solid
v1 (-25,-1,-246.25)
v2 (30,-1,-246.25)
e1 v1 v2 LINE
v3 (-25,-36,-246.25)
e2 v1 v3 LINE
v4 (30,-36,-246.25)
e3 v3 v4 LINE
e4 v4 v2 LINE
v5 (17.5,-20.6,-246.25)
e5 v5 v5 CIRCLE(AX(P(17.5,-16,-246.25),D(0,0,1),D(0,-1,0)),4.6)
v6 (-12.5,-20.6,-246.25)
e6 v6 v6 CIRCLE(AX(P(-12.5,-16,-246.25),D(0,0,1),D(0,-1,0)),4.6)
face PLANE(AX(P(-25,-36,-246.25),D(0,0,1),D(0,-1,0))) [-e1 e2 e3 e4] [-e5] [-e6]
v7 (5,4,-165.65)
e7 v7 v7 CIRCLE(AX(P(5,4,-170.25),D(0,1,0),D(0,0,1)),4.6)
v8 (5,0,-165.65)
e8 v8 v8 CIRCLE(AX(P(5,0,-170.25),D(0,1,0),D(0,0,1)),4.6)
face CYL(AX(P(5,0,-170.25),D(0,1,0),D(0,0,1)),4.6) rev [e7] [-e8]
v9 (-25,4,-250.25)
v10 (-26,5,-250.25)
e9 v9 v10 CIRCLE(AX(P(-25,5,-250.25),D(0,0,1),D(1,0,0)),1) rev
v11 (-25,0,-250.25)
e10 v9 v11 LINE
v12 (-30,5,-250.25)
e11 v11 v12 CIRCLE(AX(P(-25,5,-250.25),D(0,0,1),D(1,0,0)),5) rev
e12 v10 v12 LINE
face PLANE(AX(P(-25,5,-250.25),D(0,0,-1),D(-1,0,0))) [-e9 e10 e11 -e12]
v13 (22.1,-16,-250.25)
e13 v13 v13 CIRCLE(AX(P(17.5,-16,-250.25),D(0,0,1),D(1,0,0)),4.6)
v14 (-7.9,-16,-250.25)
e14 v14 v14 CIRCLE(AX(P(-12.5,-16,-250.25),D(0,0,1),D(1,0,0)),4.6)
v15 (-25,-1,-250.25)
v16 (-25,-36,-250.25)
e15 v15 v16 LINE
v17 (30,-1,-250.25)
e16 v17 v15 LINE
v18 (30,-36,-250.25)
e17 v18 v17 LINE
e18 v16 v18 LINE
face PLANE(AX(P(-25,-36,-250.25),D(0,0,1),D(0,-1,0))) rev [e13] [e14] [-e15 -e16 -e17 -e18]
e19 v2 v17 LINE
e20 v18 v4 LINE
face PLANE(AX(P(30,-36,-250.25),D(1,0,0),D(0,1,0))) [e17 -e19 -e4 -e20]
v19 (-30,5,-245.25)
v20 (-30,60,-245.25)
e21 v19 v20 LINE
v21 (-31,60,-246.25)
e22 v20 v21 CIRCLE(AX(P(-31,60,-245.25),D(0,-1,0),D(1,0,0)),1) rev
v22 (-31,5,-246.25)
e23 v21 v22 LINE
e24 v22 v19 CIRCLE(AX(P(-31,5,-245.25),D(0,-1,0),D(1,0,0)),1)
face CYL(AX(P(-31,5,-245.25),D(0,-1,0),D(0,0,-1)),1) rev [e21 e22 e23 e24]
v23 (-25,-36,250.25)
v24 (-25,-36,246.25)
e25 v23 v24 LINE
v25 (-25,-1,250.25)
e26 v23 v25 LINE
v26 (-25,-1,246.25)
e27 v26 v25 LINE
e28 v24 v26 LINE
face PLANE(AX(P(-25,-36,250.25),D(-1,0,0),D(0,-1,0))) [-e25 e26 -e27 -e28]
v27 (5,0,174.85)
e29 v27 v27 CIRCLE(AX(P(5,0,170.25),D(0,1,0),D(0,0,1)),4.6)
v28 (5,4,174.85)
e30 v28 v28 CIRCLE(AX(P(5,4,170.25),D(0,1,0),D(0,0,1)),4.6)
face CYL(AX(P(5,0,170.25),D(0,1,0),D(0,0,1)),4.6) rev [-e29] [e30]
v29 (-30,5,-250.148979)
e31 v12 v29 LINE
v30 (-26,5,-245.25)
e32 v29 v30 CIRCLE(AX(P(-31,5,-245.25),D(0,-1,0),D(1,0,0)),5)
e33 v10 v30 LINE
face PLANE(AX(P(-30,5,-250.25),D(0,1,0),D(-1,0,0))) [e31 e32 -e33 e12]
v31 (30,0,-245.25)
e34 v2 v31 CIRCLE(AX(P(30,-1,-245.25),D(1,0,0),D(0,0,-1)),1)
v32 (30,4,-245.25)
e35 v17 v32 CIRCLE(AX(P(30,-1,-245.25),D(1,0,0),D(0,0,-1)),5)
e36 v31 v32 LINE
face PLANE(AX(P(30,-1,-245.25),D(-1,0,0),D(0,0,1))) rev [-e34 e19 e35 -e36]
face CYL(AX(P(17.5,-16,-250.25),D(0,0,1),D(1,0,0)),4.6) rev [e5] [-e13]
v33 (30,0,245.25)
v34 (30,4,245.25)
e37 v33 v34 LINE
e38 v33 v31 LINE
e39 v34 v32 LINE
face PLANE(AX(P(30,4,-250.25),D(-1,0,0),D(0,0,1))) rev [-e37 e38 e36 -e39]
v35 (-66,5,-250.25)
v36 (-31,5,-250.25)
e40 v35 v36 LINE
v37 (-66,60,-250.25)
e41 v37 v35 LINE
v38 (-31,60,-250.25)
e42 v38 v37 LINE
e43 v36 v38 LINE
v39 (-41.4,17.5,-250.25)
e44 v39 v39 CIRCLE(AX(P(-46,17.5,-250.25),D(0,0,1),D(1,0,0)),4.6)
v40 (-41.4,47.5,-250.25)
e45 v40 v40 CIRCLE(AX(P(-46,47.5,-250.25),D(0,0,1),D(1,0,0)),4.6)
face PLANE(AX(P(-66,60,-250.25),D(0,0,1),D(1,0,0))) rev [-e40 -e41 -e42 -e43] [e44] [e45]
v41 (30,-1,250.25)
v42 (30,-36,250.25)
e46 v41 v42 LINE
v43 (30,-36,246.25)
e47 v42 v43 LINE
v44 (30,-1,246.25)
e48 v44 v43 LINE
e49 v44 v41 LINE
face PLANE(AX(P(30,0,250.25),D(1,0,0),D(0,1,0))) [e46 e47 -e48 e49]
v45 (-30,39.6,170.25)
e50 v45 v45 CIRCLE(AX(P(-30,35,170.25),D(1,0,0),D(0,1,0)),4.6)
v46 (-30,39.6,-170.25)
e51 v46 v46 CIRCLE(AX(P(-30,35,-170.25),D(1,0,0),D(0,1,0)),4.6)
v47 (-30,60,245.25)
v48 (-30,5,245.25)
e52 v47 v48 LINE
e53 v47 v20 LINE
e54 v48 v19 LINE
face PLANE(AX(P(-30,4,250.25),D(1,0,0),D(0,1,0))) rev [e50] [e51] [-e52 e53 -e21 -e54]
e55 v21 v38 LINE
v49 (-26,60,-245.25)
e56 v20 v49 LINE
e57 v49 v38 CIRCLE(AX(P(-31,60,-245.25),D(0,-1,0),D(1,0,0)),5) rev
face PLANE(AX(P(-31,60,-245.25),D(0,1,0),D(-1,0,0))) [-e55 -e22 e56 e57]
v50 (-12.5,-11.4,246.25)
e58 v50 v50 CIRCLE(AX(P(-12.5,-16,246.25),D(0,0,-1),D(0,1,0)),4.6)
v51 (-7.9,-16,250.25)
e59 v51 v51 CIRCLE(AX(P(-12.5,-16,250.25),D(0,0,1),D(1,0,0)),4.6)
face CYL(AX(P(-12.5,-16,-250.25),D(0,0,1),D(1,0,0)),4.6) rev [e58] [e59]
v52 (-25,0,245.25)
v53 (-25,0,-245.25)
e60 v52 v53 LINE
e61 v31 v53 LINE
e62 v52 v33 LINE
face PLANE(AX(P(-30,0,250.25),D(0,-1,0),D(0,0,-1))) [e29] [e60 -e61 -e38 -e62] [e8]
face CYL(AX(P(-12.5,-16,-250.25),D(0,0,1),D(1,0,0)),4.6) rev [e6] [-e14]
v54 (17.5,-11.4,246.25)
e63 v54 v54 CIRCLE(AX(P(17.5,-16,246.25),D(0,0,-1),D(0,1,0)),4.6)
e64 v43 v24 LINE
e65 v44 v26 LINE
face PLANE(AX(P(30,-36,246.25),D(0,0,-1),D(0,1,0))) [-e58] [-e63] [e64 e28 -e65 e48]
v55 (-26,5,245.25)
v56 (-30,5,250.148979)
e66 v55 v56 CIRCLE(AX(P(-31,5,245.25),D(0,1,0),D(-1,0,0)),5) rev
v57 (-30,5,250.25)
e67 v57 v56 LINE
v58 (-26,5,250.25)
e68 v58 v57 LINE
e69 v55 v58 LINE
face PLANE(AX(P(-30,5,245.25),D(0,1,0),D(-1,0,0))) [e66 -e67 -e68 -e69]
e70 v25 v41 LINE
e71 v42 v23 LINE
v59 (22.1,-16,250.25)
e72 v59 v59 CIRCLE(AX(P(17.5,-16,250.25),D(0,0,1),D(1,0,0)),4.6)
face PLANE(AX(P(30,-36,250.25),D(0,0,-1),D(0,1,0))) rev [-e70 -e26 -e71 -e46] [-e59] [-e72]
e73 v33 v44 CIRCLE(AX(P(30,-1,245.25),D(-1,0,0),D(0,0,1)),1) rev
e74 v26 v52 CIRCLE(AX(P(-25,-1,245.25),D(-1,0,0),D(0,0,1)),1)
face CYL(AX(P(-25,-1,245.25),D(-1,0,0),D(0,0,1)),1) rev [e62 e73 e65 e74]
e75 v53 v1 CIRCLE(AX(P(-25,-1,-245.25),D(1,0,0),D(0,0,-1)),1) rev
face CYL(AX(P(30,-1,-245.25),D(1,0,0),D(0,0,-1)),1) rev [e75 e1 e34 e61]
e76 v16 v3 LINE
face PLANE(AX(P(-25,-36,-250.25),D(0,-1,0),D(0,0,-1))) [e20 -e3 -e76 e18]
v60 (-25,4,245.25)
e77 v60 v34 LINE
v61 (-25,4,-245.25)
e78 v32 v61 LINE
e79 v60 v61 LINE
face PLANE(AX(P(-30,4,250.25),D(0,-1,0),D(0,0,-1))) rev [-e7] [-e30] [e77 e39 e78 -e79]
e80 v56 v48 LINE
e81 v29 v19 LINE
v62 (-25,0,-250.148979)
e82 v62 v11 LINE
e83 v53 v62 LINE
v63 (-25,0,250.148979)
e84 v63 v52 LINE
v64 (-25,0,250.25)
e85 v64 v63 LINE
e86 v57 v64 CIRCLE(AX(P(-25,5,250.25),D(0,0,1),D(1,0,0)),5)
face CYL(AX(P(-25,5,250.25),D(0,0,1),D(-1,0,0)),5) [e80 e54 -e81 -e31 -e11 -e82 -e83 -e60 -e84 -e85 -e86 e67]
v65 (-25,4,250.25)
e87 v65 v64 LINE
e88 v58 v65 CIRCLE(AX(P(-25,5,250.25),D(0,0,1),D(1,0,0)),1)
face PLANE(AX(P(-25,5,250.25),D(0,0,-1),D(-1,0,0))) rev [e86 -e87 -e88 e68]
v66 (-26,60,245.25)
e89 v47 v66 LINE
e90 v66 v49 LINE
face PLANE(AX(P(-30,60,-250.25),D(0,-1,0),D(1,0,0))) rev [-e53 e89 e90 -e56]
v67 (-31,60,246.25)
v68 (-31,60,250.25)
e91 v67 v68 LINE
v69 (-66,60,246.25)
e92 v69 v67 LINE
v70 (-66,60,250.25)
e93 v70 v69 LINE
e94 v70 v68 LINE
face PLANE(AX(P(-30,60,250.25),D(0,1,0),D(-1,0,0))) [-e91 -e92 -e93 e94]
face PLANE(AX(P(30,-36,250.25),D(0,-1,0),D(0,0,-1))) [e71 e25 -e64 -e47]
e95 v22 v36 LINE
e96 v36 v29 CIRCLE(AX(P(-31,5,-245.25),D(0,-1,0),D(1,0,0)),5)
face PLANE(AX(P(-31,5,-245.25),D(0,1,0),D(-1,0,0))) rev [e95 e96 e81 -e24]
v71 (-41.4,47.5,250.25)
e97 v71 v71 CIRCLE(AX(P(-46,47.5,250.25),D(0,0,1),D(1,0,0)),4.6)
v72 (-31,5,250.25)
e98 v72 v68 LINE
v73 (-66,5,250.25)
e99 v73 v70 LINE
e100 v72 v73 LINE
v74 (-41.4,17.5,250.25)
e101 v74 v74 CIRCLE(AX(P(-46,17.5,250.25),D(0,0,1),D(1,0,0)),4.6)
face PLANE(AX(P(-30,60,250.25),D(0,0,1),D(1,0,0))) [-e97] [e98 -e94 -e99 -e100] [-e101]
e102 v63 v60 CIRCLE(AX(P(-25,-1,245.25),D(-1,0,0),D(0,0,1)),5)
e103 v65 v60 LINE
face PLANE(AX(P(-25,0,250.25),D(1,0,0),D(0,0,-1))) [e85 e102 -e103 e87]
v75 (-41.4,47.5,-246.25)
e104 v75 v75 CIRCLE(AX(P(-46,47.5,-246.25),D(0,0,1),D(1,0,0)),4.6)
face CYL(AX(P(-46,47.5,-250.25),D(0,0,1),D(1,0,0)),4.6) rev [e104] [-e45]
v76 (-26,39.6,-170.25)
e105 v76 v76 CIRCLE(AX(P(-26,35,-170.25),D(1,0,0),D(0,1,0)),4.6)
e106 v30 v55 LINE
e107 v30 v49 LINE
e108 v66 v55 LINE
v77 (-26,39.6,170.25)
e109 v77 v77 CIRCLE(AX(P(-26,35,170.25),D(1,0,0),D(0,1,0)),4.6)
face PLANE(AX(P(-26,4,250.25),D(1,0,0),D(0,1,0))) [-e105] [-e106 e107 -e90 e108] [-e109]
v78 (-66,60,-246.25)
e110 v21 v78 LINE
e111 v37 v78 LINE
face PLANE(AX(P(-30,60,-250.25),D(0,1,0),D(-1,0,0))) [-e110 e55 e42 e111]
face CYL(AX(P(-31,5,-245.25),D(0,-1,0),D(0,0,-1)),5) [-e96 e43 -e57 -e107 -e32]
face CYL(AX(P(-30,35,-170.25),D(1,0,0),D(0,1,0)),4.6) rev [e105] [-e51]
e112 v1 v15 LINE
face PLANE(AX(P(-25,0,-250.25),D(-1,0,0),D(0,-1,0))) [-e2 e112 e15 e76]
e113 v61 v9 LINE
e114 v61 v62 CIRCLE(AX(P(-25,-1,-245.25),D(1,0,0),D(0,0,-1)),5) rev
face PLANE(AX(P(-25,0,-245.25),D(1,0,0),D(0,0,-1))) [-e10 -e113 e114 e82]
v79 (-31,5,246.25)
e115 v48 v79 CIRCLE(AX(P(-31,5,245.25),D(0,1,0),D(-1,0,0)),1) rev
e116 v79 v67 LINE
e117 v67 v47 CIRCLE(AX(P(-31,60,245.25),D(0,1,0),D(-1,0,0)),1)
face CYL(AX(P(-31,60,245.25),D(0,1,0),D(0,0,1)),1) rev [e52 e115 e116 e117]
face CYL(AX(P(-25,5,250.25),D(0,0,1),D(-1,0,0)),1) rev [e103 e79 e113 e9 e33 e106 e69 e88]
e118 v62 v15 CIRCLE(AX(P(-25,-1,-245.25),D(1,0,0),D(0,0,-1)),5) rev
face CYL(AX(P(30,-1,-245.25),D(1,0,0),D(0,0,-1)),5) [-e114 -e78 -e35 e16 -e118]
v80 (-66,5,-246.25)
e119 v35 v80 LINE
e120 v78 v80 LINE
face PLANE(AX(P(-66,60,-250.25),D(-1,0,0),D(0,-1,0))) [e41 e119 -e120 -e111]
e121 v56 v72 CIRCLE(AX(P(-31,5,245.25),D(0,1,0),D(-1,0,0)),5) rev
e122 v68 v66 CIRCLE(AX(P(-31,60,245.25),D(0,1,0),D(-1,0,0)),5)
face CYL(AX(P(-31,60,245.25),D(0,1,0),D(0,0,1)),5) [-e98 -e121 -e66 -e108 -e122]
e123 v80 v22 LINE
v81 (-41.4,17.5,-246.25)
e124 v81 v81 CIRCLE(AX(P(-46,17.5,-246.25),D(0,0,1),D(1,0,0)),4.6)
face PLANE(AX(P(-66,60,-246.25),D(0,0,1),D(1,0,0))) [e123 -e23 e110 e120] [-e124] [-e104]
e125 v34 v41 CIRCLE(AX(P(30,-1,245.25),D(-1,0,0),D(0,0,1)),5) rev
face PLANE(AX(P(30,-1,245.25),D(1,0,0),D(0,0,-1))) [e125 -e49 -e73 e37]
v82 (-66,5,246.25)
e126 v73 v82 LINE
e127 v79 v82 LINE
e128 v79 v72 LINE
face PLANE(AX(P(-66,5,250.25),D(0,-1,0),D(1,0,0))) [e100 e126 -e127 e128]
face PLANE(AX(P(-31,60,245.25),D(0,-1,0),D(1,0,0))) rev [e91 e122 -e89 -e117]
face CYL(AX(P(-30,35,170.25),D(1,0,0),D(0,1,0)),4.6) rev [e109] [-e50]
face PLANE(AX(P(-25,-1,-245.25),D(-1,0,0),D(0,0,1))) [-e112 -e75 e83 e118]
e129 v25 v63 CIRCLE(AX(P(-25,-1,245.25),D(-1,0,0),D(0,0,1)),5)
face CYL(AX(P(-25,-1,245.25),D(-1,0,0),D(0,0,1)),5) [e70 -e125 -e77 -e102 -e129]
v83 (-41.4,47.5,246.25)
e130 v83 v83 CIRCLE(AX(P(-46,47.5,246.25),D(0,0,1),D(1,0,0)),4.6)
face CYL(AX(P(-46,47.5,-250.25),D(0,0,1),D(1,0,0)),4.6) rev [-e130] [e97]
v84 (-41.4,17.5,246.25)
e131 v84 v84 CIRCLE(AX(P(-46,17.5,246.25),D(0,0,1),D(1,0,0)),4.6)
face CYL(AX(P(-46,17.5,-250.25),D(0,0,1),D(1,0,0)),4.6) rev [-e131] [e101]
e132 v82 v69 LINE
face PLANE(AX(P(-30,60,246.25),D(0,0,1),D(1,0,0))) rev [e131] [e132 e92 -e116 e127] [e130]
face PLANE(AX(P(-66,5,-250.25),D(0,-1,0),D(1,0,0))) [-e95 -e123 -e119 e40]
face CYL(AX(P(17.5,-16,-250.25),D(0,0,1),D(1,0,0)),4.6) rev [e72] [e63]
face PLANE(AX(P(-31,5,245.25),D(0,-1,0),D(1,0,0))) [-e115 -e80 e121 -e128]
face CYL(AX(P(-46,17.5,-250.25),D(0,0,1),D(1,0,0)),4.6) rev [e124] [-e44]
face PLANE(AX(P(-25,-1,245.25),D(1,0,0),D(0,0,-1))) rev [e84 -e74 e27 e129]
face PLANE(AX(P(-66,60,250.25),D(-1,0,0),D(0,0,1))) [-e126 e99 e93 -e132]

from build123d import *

# Parameters (mm, degrees)
SKETCH1_W                      = 60
SKETCH1_H                      = 500.5
BASE_FLANGE1_DEPTH             = 4
EDGE_FLANGE1_STRIP_W           = 18
EDGE_FLANGE1_STRIP_H           = 4
EDGE_FLANGE1_STRIP_CUT_DEPTH   = 500.5
EDGE_FLANGE1_DEPTH             = 500.5
EDGE_FLANGE2_STRIP_W           = 18
EDGE_FLANGE2_STRIP_H           = 4
EDGE_FLANGE2_STRIP_CUT_DEPTH   = 55
EDGE_FLANGE2_STRIP_2_W         = 18
EDGE_FLANGE2_STRIP_2_H         = 4
EDGE_FLANGE2_STRIP_CUT_2_DEPTH = 55
EDGE_FLANGE2_STRIP_3_W         = 18
EDGE_FLANGE2_STRIP_3_H         = 4
EDGE_FLANGE2_STRIP_CUT_3_DEPTH = 55
EDGE_FLANGE2_STRIP_4_W         = 18
EDGE_FLANGE2_STRIP_4_H         = 4
EDGE_FLANGE2_STRIP_CUT_4_DEPTH = 55
EDGE_FLANGE2_DEPTH             = 55
EDGE_FLANGE2_BEND_DEPTH        = 55
EDGE_FLANGE2_BEND_2_DEPTH      = 55
EDGE_FLANGE2_BEND_3_DEPTH      = 55
SKETCH18_R                     = 4.6
EXTRUDE1_DEPTH                 = 509.385926241
SKETCH19_R                     = 4.6
EXTRUDE2_DEPTH                 = 4
SKETCH20_R                     = 4.6
EXTRUDE3_DEPTH                 = 4


# Sheet-metal steps are written as plain solids
with BuildPart() as part:
    # Sketch1 → Base-Flange1 (new body)
    with BuildSketch(Plane(origin=(0, 0, 0), x_dir=(1, 0, 0), z_dir=(0, 1, 0))):
        Rectangle(SKETCH1_W, SKETCH1_H)
    extrude(amount=BASE_FLANGE1_DEPTH)

    # Edge-Flange1 strip (across the edge) → Edge-Flange1 strip cut (cut)
    with BuildSketch(Plane(origin=(-30, 4, -250.25), x_dir=(1, 0, 0), z_dir=(0, 0, 1))):
        with Locations((-4, -2)):
            Rectangle(EDGE_FLANGE1_STRIP_W, EDGE_FLANGE1_STRIP_H)
    extrude(amount=EDGE_FLANGE1_STRIP_CUT_DEPTH, mode=Mode.SUBTRACT)

    # Edge-Flange1 section (across the edge) → Edge-Flange1 (add)
    with BuildSketch(Plane(origin=(-30, 4, -250.25), x_dir=(1, 0, 0), z_dir=(0, 0, 1))):
        with BuildLine():
            Line((0, 1), (0, 56))
            Line((0, 56), (4, 56))
            Line((4, 56), (4, 1))
            ThreePointArc((4, 1), (4.292893219, 0.292893219), (5, 0))
            Line((5, 0), (5, -4))
            ThreePointArc((5, -4), (1.464466094, -2.535533906), (0, 1))
        make_face()
    extrude(amount=EDGE_FLANGE1_DEPTH)

    # Edge-Flange2 strip (across the edge) → Edge-Flange2 strip cut (cut)
    with BuildSketch(Plane(origin=(-30, 5, 250.25), x_dir=(0, 0, -1), z_dir=(0, 1, 0))):
        with Locations((-4, -2)):
            Rectangle(EDGE_FLANGE2_STRIP_W, EDGE_FLANGE2_STRIP_H)
    extrude(amount=EDGE_FLANGE2_STRIP_CUT_DEPTH, mode=Mode.SUBTRACT)

    # Edge-Flange2 strip 2 (across the edge) → Edge-Flange2 strip cut 2 (cut)
    with BuildSketch(Plane(origin=(30, 0, 250.25), x_dir=(0, 0, -1), z_dir=(-1, 0, 0))):
        with Locations((-4, -2)):
            Rectangle(EDGE_FLANGE2_STRIP_2_W, EDGE_FLANGE2_STRIP_2_H)
    extrude(amount=EDGE_FLANGE2_STRIP_CUT_2_DEPTH, mode=Mode.SUBTRACT)

    # Edge-Flange2 strip 3 (across the edge) → Edge-Flange2 strip cut 3 (cut)
    with BuildSketch(Plane(origin=(-30, 60, -250.25), x_dir=(0, 0, 1), z_dir=(0, -1, 0))):
        with Locations((-4, -2)):
            Rectangle(EDGE_FLANGE2_STRIP_3_W, EDGE_FLANGE2_STRIP_3_H)
    extrude(amount=EDGE_FLANGE2_STRIP_CUT_3_DEPTH, mode=Mode.SUBTRACT)

    # Edge-Flange2 strip 4 (across the edge) → Edge-Flange2 strip cut 4 (cut)
    with BuildSketch(Plane(origin=(-25, 0, -250.25), x_dir=(0, 0, 1), z_dir=(1, 0, 0))):
        with Locations((-4, -2)):
            Rectangle(EDGE_FLANGE2_STRIP_4_W, EDGE_FLANGE2_STRIP_4_H)
    extrude(amount=EDGE_FLANGE2_STRIP_CUT_4_DEPTH, mode=Mode.SUBTRACT)

    # Edge-Flange2 section (across the edge) → Edge-Flange2 (add)
    with BuildSketch(Plane(origin=(-30, 5, 250.25), x_dir=(0, 0, -1), z_dir=(0, 1, 0))):
        with BuildLine():
            Line((0, 1), (0, 36))
            Line((0, 36), (4, 36))
            Line((4, 36), (4, 1))
            ThreePointArc((4, 1), (4.292893219, 0.292893219), (5, 0))
            Line((5, 0), (5, -4))
            ThreePointArc((5, -4), (1.464466094, -2.535533906), (0, 1))
        make_face()
    extrude(amount=EDGE_FLANGE2_DEPTH)

    # Edge-Flange2 section 2 (across the edge) → Edge-Flange2 bend (add)
    with BuildSketch(Plane(origin=(30, 0, 250.25), x_dir=(0, 0, -1), z_dir=(-1, 0, 0))):
        with BuildLine():
            Line((0, 1), (0, 36))
            Line((0, 36), (4, 36))
            Line((4, 36), (4, 1))
            ThreePointArc((4, 1), (4.292893219, 0.292893219), (5, 0))
            Line((5, 0), (5, -4))
            ThreePointArc((5, -4), (1.464466094, -2.535533906), (0, 1))
        make_face()
    extrude(amount=EDGE_FLANGE2_BEND_DEPTH)

    # Edge-Flange2 section 3 (across the edge) → Edge-Flange2 bend 2 (add)
    with BuildSketch(Plane(origin=(-30, 60, -250.25), x_dir=(0, 0, 1), z_dir=(0, -1, 0))):
        with BuildLine():
            Line((0, 1), (0, 36))
            Line((0, 36), (4, 36))
            Line((4, 36), (4, 1))
            ThreePointArc((4, 1), (4.292893219, 0.292893219), (5, 0))
            Line((5, 0), (5, -4))
            ThreePointArc((5, -4), (1.464466094, -2.535533906), (0, 1))
        make_face()
    extrude(amount=EDGE_FLANGE2_BEND_2_DEPTH)

    # Edge-Flange2 section 4 (across the edge) → Edge-Flange2 bend 3 (add)
    with BuildSketch(Plane(origin=(-25, 0, -250.25), x_dir=(0, 0, 1), z_dir=(1, 0, 0))):
        with BuildLine():
            Line((0, 1), (0, 36))
            Line((0, 36), (4, 36))
            Line((4, 36), (4, 1))
            ThreePointArc((4, 1), (4.292893219, 0.292893219), (5, 0))
            Line((5, 0), (5, -4))
            ThreePointArc((5, -4), (1.464466094, -2.535533906), (0, 1))
        make_face()
    extrude(amount=EDGE_FLANGE2_BEND_3_DEPTH)

    # Sketch18 → Extrude1 (cut, through all)
    with BuildSketch(Plane.XY.offset(250.25)):
        with Locations((-46, 47.5)):
            Circle(SKETCH18_R)
        with Locations((-46, 17.5)):
            Circle(SKETCH18_R)
        with Locations((-12.5, -16)):
            Circle(SKETCH18_R)
        with Locations((17.5, -16)):
            Circle(SKETCH18_R)
    extrude(amount=-EXTRUDE1_DEPTH, mode=Mode.SUBTRACT)

    # Sketch19 → Extrude2 (cut)
    with BuildSketch(Plane(origin=(-26, 0, 0), x_dir=(0, 0, -1), z_dir=(1, 0, 0))):
        with Locations(Location((-170.25, 35, 0), (0, 0, 90))):
            Circle(SKETCH19_R)
        with Locations(Location((170.25, 35, 0), (0, 0, 90))):
            Circle(SKETCH19_R)
    extrude(amount=-EXTRUDE2_DEPTH, mode=Mode.SUBTRACT)

    # Sketch20 → Extrude3 (cut)
    with BuildSketch(Plane(origin=(0, 4, 0), x_dir=(1, 0, 0), z_dir=(0, 1, 0))):
        with Locations(Location((5, 170.25, 0), (0, 0, 270))):
            Circle(SKETCH20_R)
        with Locations(Location((5, -170.25, 0), (0, 0, 270))):
            Circle(SKETCH20_R)
    extrude(amount=-EXTRUDE3_DEPTH, mode=Mode.SUBTRACT)


solid = part.part
